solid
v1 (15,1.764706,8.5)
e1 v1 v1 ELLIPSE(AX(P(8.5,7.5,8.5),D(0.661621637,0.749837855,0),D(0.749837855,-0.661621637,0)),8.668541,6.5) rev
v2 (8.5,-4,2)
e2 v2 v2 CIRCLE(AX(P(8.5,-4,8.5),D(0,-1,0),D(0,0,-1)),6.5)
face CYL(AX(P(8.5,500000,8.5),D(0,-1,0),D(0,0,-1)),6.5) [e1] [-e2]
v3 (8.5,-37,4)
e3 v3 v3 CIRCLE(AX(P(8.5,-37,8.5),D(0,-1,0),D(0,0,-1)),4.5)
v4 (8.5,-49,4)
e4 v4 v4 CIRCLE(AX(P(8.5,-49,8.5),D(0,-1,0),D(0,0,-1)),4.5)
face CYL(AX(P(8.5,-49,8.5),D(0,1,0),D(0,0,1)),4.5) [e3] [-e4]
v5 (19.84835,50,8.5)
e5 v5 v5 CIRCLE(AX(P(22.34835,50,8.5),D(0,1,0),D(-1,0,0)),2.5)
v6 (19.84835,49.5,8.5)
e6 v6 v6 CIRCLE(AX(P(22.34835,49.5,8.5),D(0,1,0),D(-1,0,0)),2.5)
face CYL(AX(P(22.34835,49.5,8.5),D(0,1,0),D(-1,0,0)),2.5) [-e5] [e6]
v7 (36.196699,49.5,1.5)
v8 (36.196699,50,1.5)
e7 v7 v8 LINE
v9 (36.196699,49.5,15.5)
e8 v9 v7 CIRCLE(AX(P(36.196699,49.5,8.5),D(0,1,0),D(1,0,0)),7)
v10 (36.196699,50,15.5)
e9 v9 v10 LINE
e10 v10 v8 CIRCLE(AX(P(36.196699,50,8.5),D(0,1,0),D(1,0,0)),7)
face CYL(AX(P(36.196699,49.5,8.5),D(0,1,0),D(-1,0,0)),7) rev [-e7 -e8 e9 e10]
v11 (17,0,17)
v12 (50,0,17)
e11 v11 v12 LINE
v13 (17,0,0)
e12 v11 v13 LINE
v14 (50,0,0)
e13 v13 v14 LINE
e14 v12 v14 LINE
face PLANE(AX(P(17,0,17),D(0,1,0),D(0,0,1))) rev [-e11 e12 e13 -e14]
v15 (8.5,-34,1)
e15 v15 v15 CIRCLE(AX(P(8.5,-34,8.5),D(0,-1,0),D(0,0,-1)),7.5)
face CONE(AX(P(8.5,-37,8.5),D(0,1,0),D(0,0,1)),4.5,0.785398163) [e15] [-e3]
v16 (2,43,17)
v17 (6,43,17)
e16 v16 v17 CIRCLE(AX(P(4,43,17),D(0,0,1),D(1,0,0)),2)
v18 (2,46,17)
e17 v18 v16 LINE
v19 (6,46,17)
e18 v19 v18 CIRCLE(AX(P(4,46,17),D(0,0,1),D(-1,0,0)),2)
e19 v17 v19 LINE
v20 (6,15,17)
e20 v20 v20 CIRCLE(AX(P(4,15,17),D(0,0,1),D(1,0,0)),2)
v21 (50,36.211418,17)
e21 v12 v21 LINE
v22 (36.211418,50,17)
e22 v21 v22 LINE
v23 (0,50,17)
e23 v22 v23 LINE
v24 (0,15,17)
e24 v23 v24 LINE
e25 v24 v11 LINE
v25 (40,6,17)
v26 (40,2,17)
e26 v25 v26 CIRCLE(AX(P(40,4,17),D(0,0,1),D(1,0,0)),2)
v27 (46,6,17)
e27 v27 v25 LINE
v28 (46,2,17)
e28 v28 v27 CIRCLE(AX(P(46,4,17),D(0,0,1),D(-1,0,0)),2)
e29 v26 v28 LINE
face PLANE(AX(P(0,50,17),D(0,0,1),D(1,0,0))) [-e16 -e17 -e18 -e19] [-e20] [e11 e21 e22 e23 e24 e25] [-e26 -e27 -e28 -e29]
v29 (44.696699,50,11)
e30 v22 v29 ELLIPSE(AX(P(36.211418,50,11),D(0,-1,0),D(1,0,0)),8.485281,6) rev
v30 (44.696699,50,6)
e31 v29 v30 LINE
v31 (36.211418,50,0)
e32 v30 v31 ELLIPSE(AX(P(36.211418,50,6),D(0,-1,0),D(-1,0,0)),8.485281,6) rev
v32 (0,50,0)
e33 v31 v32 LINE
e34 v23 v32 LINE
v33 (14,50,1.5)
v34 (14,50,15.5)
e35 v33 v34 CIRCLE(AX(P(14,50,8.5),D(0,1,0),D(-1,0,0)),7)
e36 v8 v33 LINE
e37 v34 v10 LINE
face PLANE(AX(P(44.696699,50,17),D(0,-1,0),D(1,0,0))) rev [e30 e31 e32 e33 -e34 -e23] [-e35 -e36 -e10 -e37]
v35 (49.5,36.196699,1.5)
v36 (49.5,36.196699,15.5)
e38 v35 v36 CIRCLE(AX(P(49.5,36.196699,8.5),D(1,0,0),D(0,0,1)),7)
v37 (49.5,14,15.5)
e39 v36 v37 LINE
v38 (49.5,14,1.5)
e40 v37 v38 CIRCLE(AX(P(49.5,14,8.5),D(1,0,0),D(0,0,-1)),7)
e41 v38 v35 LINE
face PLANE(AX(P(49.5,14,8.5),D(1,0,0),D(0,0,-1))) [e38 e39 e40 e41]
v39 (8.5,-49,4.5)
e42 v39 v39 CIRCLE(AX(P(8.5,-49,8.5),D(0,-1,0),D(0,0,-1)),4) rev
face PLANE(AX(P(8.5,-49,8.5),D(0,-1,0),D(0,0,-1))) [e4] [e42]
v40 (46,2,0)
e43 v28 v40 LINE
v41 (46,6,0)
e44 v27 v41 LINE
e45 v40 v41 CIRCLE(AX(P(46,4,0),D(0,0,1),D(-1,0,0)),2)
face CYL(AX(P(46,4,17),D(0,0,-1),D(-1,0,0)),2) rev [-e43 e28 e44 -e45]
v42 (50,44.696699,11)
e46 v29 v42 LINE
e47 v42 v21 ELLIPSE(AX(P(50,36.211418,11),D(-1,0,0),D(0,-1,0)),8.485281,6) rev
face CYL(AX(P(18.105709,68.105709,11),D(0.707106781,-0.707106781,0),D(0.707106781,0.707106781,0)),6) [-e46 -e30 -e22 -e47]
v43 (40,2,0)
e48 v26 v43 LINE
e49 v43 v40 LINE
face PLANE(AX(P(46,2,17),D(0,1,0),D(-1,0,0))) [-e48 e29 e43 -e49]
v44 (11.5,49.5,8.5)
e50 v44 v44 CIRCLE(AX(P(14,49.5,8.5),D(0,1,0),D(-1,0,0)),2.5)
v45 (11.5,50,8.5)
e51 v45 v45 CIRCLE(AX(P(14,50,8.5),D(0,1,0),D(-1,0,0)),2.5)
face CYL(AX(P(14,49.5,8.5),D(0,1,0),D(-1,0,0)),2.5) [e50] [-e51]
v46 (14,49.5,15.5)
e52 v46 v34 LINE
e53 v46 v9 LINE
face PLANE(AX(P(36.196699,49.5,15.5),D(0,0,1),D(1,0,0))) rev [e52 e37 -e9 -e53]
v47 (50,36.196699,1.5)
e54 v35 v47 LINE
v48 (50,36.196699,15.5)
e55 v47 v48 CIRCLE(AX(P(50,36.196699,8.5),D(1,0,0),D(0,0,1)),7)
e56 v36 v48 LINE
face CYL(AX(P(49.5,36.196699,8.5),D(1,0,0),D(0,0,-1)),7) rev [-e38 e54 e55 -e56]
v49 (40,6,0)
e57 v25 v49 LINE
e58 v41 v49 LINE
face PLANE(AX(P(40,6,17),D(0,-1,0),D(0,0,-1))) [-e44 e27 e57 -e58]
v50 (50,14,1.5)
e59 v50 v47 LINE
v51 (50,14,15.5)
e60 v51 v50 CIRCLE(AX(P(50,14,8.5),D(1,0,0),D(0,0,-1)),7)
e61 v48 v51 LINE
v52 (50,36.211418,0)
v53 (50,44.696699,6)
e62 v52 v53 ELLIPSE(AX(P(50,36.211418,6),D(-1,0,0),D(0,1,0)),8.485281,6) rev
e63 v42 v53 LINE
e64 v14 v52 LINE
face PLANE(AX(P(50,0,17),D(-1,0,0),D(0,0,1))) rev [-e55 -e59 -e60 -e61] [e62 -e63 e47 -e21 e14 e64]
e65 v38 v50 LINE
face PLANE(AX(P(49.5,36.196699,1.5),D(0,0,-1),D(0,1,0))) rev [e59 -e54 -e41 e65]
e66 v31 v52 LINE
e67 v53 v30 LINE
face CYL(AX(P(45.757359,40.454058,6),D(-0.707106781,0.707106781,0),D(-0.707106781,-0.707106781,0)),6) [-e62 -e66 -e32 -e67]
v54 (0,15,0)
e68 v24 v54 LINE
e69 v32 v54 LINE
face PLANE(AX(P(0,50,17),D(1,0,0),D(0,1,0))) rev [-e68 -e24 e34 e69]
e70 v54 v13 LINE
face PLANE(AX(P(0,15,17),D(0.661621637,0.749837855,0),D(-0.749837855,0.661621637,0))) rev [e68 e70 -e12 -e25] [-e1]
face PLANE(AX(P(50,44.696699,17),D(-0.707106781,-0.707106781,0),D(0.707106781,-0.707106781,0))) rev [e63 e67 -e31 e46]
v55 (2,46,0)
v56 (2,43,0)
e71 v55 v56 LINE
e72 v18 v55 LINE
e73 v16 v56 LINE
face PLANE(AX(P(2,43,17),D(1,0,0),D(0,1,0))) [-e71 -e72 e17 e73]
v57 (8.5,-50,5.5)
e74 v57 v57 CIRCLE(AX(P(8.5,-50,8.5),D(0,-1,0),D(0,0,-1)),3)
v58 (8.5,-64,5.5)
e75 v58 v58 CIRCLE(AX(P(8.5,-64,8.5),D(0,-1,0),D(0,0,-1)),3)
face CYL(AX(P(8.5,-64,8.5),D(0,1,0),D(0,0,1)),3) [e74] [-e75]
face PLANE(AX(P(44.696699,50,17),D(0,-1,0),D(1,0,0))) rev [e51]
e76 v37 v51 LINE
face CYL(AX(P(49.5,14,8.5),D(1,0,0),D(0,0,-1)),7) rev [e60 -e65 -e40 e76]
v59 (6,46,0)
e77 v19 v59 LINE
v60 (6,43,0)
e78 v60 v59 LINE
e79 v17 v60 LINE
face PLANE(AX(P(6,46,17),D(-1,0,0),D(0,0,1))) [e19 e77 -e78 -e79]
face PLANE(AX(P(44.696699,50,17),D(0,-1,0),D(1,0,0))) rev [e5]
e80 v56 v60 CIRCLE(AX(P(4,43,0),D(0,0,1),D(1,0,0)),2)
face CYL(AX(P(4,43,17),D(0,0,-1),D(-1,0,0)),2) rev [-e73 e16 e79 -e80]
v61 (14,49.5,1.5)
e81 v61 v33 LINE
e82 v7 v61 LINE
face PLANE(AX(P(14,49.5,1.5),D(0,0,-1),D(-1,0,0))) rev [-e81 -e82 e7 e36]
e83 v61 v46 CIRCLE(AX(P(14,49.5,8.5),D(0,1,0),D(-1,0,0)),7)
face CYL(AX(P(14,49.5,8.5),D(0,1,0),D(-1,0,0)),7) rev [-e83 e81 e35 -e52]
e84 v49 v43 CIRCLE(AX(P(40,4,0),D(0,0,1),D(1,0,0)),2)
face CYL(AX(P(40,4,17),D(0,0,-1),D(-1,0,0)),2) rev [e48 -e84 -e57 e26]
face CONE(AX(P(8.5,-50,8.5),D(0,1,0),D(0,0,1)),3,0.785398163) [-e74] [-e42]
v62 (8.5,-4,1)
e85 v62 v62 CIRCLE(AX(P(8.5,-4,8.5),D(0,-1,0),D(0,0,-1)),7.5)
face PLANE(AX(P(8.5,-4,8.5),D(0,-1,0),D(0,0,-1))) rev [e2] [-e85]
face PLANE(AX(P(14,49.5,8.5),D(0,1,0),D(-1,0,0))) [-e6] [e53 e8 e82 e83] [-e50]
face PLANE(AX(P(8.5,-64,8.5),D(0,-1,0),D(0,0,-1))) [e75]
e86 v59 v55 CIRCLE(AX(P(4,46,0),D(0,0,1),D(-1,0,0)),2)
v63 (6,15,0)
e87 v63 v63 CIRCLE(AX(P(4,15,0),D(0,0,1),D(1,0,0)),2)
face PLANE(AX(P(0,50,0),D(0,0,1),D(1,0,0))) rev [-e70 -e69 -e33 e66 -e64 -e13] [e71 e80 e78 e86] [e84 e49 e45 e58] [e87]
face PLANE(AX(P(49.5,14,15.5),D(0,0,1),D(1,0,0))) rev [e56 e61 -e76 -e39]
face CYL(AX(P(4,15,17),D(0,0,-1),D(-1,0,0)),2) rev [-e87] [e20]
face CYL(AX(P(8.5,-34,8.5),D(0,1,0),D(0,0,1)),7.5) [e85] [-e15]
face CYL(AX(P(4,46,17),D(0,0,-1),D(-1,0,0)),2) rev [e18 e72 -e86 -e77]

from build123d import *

# Parameters (mm, degrees)
ESQUISSE1_R                  = 2
EXTRUSION1_DEPTH             = 17
CONG_1_R                     = 6
ESQUISSE5_R                  = 6.5
EXTRUSION3_DEPTH             = 4
EXTRUSION3_DIRECTION_2_REACH = 74.726
ESQUISSE6_R                  = 7.5
EXTRUSION4_DEPTH             = 30
ESQUISSE7_R                  = 4.5
EXTRUSION5_DEPTH             = 15
CHANFREIN2_SIZE              = 3
ESQUISSE8_R                  = 3
EXTRUSION6_DEPTH             = 15
CHANFREIN3_SIZE              = 1
EXTRUSION7_DEPTH             = 0.5
ESQUISSE10_R                 = 2.5
EXTRUSION8_DEPTH             = 0.5


with BuildPart() as part:
    # Esquisse1 → Extrusion1 (new body)
    with BuildSketch(Plane.XY):
        Polygon((0, 50), (0, 15), (17, 0), (50, 0), (50, 44.696699141), (44.696699141, 50), align=None)
        with Locations((4, 15)):
            Circle(ESQUISSE1_R, mode=Mode.SUBTRACT)
        with BuildLine():
            Line((2, 43), (2, 46))
            ThreePointArc((2, 46), (4, 48), (6, 46))
            Line((6, 46), (6, 43))
            ThreePointArc((6, 43), (4, 41), (2, 43))
        make_face(mode=Mode.SUBTRACT)
        with BuildLine():
            Line((40, 6), (46, 6))
            ThreePointArc((46, 6), (48, 4), (46, 2))
            Line((46, 2), (40, 2))
            ThreePointArc((40, 2), (38, 4), (40, 6))
        make_face(mode=Mode.SUBTRACT)
    extrude(amount=EXTRUSION1_DEPTH)

    # Congé1
    cong_1_edges = [part.edges().sort_by_distance(p)[0] for p in [
        (47.348349571, 47.348349571, 17),
        (47.348349571, 47.348349571, 0),
    ]]
    fillet(cong_1_edges, radius=CONG_1_R)

    # Esquisse5 → Extrusion3 (add)
    with BuildSketch(Plane.XZ):
        with Locations(Location((8.5, 8.5, 0), (0, 0, 270))):
            Circle(ESQUISSE5_R)
    extrude(amount=EXTRUSION3_DEPTH)

    # Esquisse5 → Extrusion3 direction 2 (add, up to next)
    with BuildSketch(Plane.XZ, mode=Mode.PRIVATE) as extrusion3_direction_2_sk1:
        with Locations(Location((8.5, 8.5, 0), (0, 0, 270))):
            Circle(ESQUISSE5_R)
    extrusion3_direction_2_tool1 = extrude(extrusion3_direction_2_sk1.sketch, amount=-EXTRUSION3_DIRECTION_2_REACH, mode=Mode.PRIVATE) - part.part
    add(extrusion3_direction_2_tool1.solids().sort_by_distance((8.5, 0, 8.5))[0])

    # Esquisse6 → Extrusion4 (add)
    with BuildSketch(Plane.XZ.offset(4)):
        with Locations(Location((8.5, 8.5, 0), (0, 0, 270))):
            Circle(ESQUISSE6_R)
    extrude(amount=EXTRUSION4_DEPTH)

    # Esquisse7 → Extrusion5 (add)
    with BuildSketch(Plane.XZ.offset(34)):
        with Locations(Location((8.5, 8.5, 0), (0, 0, 270))):
            Circle(ESQUISSE7_R)
    extrude(amount=EXTRUSION5_DEPTH)

    # Chanfrein2
    chanfrein2_edges = [part.edges().sort_by_distance(p)[0] for p in [
        (8.5, -34, 13),
    ]]
    chamfer(chanfrein2_edges, length=CHANFREIN2_SIZE - 0.0001)  # a hair under: the kernel refuses the full size

    # Esquisse8 → Extrusion6 (add)
    with BuildSketch(Plane.XZ.offset(49)):
        with Locations(Location((8.5, 8.5, 0), (0, 0, 270))):
            Circle(ESQUISSE8_R)
    extrude(amount=EXTRUSION6_DEPTH)

    # Chanfrein3
    chanfrein3_edges = [part.edges().sort_by_distance(p)[0] for p in [
        (8.5, -49, 11.5),
    ]]
    chamfer(chanfrein3_edges, length=CHANFREIN3_SIZE)

    # Esquisse9 → Extrusion7 (cut)
    with BuildSketch(Plane(origin=(50, 0, 0), x_dir=(0, 0, -1), z_dir=(1, 0, 0))):
        with BuildLine():
            Line((-15.5, 14), (-15.5, 36.196699141))
            ThreePointArc((-15.5, 36.196699141), (-8.5, 43.196699141), (-1.5, 36.196699141))
            Line((-1.5, 36.196699141), (-1.5, 14))
            ThreePointArc((-1.5, 14), (-8.5, 7), (-15.5, 14))
        make_face()
    extrude(amount=-EXTRUSION7_DEPTH, mode=Mode.SUBTRACT)

    # Esquisse10 → Extrusion8 (cut)
    with BuildSketch(Plane(origin=(0, 50, 0), x_dir=(1, 0, 0), z_dir=(0, 1, 0))):
        with BuildLine():
            Line((14, -1.5), (36.196699141, -1.5))
            ThreePointArc((36.196699141, -1.5), (43.196699141, -8.5), (36.196699141, -15.5))
            Line((36.196699141, -15.5), (14, -15.5))
            ThreePointArc((14, -15.5), (7, -8.5), (14, -1.5))
        make_face()
        with Locations(Location((14, -8.5, 0), (0, 0, 180))):
            Circle(ESQUISSE10_R, mode=Mode.SUBTRACT)
        with Locations(Location((22.348349571, -8.5, 0), (0, 0, 180))):
            Circle(ESQUISSE10_R, mode=Mode.SUBTRACT)
    extrude(amount=-EXTRUSION8_DEPTH, mode=Mode.SUBTRACT)


solid = part.part
